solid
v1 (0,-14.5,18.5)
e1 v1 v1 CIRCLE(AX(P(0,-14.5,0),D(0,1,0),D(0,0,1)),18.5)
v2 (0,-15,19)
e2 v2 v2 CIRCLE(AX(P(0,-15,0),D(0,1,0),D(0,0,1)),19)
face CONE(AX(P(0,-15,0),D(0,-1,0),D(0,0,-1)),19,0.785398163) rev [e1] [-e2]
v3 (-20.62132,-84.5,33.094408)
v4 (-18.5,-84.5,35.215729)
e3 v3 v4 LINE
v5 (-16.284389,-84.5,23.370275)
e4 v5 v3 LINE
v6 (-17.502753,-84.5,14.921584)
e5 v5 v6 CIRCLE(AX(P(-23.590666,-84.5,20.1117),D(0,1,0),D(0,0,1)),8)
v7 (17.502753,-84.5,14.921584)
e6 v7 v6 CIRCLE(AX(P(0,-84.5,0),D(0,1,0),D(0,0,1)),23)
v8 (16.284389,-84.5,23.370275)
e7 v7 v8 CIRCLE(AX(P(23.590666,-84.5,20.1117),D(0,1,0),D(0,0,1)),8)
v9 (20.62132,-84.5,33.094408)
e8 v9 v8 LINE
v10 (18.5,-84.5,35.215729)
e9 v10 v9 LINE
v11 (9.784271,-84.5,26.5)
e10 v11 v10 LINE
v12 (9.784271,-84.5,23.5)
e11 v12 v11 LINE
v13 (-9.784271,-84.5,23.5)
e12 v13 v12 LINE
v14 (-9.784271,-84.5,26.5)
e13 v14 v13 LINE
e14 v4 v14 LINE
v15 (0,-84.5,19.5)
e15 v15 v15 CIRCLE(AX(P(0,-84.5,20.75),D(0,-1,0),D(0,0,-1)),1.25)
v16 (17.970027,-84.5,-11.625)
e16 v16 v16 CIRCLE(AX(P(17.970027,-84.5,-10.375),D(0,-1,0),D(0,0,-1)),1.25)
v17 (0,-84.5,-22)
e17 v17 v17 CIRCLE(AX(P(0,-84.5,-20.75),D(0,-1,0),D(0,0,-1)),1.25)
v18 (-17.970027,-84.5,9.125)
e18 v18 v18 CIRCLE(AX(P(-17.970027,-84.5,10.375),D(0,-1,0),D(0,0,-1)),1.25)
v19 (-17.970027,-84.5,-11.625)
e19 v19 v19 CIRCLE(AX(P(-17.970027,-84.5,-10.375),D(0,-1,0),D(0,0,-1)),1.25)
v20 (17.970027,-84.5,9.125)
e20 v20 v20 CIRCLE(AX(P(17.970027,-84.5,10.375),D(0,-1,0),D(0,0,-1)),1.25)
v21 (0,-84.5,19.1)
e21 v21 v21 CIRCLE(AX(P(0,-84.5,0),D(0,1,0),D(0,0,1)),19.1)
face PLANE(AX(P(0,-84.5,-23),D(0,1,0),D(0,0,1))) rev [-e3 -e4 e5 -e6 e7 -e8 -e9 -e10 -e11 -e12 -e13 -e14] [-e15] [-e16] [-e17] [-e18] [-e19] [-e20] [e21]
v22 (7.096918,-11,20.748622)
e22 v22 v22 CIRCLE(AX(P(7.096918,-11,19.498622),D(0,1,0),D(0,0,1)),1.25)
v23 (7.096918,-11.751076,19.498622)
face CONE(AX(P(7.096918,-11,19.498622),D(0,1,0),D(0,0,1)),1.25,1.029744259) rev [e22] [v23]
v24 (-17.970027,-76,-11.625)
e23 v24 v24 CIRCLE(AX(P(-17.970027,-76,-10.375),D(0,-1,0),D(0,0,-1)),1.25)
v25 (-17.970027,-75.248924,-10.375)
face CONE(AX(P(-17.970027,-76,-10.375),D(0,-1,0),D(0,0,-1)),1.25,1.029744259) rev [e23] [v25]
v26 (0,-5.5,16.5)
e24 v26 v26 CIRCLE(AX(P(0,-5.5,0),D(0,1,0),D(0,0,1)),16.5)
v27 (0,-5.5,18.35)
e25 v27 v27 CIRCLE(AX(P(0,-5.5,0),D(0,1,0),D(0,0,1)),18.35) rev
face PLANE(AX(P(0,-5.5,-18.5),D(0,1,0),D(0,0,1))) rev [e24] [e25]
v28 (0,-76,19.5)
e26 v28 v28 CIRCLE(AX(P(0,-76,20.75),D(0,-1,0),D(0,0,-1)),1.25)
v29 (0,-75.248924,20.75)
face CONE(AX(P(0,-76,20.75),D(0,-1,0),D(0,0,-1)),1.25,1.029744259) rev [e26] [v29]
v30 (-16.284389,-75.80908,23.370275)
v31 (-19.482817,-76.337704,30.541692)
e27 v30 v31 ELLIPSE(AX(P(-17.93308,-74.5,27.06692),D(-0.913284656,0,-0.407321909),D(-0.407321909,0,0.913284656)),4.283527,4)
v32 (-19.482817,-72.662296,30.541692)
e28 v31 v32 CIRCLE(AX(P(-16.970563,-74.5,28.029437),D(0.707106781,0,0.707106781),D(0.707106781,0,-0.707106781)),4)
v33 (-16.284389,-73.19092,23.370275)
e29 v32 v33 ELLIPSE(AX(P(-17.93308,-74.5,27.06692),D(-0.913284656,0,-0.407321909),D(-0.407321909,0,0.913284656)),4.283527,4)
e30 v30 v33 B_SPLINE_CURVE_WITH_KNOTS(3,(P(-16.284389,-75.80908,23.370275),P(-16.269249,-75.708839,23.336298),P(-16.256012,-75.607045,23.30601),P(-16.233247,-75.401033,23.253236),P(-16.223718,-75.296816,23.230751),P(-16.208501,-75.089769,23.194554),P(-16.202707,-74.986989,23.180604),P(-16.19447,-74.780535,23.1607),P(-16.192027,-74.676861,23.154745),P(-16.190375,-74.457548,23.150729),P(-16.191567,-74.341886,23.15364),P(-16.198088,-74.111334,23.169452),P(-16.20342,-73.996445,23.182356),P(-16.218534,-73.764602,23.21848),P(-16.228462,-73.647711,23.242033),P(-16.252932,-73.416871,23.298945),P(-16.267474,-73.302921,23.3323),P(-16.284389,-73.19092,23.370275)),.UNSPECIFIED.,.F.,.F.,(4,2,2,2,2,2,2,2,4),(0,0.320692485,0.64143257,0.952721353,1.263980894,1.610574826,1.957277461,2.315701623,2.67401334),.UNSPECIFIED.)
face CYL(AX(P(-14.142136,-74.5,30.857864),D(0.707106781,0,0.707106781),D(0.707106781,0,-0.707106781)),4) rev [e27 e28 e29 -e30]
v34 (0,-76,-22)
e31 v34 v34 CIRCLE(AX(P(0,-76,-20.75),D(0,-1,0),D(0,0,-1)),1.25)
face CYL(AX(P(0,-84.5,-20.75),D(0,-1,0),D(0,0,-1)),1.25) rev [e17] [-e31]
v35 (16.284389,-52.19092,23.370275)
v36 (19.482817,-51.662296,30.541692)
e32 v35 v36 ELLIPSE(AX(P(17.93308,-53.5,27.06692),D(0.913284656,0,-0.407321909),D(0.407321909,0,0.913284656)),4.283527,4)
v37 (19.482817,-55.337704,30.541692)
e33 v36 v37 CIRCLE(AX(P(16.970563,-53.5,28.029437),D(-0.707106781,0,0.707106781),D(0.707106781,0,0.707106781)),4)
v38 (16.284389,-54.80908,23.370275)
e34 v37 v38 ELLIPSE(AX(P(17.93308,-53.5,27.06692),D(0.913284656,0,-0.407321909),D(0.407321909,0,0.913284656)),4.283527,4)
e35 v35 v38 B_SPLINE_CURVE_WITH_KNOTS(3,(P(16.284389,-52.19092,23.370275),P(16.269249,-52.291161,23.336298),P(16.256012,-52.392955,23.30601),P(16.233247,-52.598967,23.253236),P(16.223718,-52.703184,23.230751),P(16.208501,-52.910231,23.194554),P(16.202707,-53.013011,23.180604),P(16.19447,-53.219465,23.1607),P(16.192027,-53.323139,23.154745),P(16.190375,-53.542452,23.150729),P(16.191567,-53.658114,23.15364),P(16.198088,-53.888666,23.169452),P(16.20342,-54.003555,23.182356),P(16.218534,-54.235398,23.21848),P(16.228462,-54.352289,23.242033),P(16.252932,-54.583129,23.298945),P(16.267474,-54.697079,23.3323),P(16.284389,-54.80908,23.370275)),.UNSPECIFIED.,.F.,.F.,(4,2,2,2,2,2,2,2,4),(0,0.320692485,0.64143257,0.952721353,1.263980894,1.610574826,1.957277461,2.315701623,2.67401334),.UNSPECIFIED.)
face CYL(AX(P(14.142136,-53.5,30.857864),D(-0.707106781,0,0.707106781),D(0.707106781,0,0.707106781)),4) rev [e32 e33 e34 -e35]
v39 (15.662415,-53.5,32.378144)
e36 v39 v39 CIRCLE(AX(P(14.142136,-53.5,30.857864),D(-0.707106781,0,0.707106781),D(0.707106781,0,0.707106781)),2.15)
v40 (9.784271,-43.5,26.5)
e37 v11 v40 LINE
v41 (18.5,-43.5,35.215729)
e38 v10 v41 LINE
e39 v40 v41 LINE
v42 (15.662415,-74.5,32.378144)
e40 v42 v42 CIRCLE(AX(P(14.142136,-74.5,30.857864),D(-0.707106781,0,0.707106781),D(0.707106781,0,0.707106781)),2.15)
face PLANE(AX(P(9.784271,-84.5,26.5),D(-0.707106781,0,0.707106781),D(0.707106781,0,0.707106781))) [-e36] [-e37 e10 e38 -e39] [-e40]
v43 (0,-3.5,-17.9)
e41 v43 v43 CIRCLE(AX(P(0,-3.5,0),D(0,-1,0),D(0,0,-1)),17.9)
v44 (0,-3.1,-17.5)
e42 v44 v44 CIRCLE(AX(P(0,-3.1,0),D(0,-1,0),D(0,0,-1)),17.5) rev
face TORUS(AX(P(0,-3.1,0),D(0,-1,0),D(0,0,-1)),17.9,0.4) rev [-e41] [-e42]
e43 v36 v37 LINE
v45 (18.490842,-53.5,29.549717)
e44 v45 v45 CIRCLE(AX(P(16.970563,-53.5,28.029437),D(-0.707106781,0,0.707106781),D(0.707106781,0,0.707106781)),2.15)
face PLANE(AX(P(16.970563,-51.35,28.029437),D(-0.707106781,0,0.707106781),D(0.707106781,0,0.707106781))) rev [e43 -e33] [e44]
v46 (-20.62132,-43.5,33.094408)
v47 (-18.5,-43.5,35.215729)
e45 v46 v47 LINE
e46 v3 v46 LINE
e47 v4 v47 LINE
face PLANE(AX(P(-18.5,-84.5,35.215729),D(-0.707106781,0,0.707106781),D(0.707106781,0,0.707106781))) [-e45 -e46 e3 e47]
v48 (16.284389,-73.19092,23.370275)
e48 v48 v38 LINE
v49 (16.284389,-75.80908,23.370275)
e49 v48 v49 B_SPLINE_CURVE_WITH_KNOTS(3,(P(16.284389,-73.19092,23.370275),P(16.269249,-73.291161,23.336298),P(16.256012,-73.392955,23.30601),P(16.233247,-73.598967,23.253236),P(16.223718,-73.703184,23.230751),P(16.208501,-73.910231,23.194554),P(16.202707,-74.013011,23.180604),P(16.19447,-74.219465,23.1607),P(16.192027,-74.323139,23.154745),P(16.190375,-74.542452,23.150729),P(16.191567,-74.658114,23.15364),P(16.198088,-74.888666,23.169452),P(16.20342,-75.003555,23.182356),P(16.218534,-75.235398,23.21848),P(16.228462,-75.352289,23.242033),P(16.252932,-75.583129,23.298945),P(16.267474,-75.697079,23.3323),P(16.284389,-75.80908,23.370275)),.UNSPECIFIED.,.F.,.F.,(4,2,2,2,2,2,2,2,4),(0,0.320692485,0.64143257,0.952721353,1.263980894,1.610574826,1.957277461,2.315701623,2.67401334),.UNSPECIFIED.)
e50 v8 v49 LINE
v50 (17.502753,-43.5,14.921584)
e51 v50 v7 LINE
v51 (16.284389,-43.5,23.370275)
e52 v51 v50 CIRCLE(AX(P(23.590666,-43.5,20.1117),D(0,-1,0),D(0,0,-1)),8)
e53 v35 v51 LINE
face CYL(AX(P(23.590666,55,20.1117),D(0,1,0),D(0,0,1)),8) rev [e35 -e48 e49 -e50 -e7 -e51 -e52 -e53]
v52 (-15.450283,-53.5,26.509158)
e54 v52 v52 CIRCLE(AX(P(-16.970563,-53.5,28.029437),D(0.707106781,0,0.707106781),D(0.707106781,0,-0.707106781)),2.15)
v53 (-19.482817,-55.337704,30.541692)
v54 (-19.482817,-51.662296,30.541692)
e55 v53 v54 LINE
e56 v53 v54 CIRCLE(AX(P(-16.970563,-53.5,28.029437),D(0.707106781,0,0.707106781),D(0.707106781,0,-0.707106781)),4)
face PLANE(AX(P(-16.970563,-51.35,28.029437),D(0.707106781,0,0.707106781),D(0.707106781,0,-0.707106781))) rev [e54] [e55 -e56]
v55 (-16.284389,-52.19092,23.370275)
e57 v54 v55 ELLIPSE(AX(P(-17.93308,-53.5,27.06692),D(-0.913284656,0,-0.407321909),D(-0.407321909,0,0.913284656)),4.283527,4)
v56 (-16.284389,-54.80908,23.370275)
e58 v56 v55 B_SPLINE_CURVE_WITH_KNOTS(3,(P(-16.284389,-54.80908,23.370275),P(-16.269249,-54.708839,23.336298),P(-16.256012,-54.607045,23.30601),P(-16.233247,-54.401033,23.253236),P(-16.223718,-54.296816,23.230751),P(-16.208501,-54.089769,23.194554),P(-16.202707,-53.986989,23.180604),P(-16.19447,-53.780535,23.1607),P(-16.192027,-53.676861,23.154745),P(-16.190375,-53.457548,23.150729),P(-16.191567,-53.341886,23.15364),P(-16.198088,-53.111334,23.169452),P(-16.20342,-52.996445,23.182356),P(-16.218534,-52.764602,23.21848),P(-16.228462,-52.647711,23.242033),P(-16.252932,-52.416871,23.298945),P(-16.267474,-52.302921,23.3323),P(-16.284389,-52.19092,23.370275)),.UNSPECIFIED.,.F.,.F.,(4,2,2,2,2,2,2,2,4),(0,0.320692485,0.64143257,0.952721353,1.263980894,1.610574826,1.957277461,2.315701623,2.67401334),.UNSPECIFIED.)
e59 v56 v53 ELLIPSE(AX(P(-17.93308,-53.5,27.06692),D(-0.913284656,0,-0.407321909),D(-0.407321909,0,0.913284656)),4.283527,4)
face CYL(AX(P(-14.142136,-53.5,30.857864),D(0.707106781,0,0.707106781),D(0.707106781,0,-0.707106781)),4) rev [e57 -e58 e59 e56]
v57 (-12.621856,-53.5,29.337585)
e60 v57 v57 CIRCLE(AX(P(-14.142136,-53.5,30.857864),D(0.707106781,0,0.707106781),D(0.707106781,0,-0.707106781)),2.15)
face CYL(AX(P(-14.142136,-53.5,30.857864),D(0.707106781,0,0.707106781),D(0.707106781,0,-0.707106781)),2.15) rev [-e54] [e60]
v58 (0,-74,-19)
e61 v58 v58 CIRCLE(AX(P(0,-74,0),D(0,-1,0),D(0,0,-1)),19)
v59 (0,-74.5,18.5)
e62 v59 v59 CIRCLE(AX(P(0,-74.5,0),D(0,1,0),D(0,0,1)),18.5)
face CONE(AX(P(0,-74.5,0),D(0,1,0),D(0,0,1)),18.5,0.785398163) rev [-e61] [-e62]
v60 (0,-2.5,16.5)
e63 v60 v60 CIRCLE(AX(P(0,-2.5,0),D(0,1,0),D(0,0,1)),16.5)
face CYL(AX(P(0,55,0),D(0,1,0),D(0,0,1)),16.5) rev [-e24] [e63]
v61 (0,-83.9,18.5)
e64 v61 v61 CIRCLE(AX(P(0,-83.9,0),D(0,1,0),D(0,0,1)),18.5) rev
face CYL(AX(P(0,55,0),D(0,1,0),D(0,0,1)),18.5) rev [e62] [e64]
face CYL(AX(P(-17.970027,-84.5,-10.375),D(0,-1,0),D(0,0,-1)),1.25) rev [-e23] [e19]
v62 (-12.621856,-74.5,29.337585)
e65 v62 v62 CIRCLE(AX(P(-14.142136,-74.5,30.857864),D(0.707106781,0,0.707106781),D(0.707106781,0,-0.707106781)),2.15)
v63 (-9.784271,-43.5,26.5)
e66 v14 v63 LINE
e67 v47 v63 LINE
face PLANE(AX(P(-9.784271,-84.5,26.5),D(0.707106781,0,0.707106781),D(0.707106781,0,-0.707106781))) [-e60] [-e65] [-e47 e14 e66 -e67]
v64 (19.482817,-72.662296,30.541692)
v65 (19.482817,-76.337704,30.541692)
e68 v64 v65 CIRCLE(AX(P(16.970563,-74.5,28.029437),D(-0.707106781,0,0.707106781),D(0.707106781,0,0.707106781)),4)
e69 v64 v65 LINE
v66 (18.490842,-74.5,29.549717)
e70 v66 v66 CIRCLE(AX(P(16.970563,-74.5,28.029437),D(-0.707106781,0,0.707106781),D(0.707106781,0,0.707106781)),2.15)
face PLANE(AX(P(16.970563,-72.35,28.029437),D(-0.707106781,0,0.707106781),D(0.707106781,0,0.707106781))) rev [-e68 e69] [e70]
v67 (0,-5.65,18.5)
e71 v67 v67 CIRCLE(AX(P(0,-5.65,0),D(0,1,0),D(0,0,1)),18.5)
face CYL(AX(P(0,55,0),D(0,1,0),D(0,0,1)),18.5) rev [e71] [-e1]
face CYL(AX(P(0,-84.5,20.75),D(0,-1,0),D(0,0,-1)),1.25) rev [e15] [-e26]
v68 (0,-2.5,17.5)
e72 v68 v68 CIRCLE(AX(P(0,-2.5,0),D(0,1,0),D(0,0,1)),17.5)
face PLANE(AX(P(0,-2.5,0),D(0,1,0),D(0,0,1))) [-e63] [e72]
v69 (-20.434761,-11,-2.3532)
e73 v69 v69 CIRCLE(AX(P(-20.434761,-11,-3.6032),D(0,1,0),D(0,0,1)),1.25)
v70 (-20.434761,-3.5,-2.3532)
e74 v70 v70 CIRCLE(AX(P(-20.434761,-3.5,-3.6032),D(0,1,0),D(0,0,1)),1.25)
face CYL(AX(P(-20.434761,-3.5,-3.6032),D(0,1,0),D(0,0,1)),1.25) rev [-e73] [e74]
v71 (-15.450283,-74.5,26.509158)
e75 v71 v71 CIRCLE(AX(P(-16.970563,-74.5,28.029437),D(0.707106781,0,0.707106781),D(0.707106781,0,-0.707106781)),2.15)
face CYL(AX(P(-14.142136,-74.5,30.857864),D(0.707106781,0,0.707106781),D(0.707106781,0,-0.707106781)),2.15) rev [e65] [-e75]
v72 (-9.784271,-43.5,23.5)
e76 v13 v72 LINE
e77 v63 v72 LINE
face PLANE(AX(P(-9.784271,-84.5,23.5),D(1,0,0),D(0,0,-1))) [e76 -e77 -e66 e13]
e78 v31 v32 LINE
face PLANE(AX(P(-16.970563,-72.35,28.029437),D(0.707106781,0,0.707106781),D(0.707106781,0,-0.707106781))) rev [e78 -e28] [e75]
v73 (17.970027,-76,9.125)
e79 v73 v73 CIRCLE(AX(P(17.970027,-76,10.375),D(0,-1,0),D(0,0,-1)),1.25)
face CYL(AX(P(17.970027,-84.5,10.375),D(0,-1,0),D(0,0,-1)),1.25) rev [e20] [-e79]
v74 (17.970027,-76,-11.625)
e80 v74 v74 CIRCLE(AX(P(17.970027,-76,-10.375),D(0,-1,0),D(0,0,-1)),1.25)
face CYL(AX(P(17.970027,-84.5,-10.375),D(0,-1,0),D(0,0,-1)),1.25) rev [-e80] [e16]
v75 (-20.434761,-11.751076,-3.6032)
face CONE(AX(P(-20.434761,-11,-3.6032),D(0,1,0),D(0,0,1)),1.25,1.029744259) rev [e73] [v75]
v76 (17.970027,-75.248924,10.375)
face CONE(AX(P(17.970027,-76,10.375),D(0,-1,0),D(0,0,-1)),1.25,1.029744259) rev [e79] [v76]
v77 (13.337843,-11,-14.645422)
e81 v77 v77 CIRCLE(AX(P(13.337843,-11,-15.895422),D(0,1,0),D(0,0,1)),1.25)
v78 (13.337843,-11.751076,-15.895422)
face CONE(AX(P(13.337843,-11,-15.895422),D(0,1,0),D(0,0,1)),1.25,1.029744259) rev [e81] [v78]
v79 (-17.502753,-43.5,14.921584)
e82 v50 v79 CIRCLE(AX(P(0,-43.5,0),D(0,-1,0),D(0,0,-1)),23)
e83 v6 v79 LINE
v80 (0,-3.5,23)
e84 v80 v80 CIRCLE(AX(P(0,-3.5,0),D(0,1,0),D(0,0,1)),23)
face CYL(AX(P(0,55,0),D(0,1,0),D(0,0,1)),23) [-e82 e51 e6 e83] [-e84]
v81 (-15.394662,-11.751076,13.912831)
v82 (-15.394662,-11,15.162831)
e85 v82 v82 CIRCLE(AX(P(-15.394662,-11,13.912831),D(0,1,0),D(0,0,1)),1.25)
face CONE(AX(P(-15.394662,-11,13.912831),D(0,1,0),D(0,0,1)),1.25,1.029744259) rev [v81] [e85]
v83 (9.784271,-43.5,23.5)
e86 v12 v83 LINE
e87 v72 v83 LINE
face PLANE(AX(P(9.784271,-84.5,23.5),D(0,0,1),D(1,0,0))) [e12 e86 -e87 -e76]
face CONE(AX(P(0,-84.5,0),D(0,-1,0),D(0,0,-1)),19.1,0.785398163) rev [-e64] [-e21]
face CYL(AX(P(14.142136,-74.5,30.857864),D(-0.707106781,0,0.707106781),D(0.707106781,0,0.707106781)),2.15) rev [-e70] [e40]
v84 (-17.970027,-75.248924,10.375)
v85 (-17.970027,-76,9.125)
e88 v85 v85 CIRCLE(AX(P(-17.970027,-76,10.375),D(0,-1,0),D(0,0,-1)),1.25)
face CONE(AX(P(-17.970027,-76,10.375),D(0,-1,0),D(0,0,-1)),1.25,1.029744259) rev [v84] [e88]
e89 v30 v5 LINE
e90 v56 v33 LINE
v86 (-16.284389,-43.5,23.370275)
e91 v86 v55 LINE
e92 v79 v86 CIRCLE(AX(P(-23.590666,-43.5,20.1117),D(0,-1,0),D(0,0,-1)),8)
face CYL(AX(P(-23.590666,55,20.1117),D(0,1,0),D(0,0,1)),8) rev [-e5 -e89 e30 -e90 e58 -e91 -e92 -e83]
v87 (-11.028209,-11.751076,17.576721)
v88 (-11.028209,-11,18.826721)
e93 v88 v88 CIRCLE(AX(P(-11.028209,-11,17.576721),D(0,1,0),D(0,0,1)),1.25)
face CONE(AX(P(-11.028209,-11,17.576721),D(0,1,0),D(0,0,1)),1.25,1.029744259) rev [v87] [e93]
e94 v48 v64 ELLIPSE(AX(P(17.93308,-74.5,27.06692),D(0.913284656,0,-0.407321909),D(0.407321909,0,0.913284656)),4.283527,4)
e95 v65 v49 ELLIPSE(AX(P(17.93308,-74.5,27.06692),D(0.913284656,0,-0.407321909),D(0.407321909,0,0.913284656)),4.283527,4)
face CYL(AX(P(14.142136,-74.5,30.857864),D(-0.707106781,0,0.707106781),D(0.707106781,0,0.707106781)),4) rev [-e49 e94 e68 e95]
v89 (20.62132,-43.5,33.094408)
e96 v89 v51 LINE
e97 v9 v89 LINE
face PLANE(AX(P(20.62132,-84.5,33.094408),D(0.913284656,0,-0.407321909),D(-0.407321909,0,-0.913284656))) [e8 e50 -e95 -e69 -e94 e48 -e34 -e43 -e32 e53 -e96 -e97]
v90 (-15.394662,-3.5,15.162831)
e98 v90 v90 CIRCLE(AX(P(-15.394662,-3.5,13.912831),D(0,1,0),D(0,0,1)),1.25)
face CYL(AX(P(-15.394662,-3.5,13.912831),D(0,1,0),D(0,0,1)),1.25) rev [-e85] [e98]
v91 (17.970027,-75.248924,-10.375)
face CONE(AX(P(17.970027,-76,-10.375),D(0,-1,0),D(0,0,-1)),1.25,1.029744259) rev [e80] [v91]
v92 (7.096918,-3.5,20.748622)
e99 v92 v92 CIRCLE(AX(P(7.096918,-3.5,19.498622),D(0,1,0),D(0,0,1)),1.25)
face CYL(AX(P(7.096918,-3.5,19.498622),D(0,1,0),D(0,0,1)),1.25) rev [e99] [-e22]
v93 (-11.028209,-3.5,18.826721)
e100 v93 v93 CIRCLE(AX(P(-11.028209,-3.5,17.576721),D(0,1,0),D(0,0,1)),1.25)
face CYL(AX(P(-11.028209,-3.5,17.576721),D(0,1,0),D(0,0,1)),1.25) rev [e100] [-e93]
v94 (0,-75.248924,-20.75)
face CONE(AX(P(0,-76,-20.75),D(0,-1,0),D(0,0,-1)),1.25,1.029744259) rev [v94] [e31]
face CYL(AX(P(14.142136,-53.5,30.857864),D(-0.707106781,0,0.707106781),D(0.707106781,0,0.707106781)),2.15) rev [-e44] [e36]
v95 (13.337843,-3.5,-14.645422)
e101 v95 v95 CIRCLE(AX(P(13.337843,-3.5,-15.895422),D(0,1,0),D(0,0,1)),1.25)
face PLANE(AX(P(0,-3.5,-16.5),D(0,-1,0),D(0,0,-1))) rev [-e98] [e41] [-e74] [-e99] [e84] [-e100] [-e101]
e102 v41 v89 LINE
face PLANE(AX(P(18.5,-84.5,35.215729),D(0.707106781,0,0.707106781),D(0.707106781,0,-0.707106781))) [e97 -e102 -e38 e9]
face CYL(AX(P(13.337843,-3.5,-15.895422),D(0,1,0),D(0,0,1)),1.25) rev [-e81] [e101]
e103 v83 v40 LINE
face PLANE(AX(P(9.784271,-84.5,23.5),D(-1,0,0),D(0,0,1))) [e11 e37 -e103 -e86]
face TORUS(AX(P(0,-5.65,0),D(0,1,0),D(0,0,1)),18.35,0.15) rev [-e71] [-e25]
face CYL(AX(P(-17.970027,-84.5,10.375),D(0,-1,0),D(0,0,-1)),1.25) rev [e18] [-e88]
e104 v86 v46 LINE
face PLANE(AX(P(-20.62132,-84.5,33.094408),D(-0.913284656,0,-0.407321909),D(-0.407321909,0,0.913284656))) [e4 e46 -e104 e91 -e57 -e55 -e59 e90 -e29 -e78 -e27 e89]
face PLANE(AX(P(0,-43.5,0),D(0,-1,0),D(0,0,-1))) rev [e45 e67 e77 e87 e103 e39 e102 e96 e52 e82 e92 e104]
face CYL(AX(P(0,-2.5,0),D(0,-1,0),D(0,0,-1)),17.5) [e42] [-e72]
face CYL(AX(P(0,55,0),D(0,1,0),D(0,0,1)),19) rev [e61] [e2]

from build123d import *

# Parameters (mm, degrees)
BOSS_EXTRUDE1_START           = -40
BOSS_EXTRUDE1_DEPTH           = 41
SKETCH7_W                     = 1.6
SKETCH7_H                     = 83.5
M3_CLEARANCE_HOLE1_AT_2_COUNT = 2
M3_CLEARANCE_HOLE1_AT_2_PITCH = 20.75
M3_CLEARANCE_HOLE1_AT_3_COUNT = 2
M3_CLEARANCE_HOLE1_AT_3_PITCH = 35.940054257
M3_CLEARANCE_HOLE1_AT_4_COUNT = 2
M3_CLEARANCE_HOLE1_AT_4_PITCH = 41.5
M3_CLEARANCE_HOLE1_AT_5_COUNT = 2
M3_CLEARANCE_HOLE1_AT_5_PITCH = 35.940054257
M3_CLEARANCE_HOLE1_AT_6_COUNT = 2
M3_CLEARANCE_HOLE1_AT_6_PITCH = 20.75
M3_TAPPED_HOLE2_AT_2_COUNT    = 2
M3_TAPPED_HOLE2_AT_2_PITCH    = 20.75
M3_TAPPED_HOLE2_AT_3_COUNT    = 2
M3_TAPPED_HOLE2_AT_3_PITCH    = 35.940054257
M3_TAPPED_HOLE2_AT_4_COUNT    = 2
M3_TAPPED_HOLE2_AT_4_PITCH    = 41.5
M3_TAPPED_HOLE2_AT_5_COUNT    = 2
M3_TAPPED_HOLE2_AT_5_PITCH    = 35.940054257
M3_TAPPED_HOLE2_AT_6_COUNT    = 2
M3_TAPPED_HOLE2_AT_6_PITCH    = 20.75
M3_TAPPED_HOLE1_AT_2_COUNT    = 2
M3_TAPPED_HOLE1_AT_2_PITCH    = 35.940054257
M3_TAPPED_HOLE1_AT_3_COUNT    = 2
M3_TAPPED_HOLE1_AT_3_PITCH    = 35.940054257
M3_TAPPED_HOLE1_AT_4_COUNT    = 2
M3_TAPPED_HOLE1_AT_4_PITCH    = 41.401555851
M3_TAPPED_HOLE1_AT_5_COUNT    = 2
M3_TAPPED_HOLE1_AT_5_PITCH    = 41.401555851
FILLET1_R                     = 8
BOSS_EXTRUDE2_START           = 1
SKETCH18_R                    = 17.5
SKETCH18_R_2                  = 16.5
BOSS_EXTRUDE2_DEPTH           = 1
ADVANCEDHOLE1_START           = -7.819805153
ADVANCEDHOLE1_DEPTH           = 2.897488682
ADVANCEDHOLE1_START_2         = -11.819805153
ADVANCEDHOLE1_2_OUTLINE_R     = 2.15
ADVANCEDHOLE1_2_DEPTH         = 4
ADVANCEDHOLE2_START           = 4.922316471
ADVANCEDHOLE2_DEPTH           = 2.897488682
ADVANCEDHOLE2_START_2         = 7.819805153
ADVANCEDHOLE2_2_OUTLINE_R     = 2.15
ADVANCEDHOLE2_2_DEPTH         = 4
FILLET2_R                     = 0.4
FILLET4_R                     = 0.15
CHAMFER1_SIZE                 = 0.5
CHAMFER2_SIZE                 = 0.6
FILLET5_R                     = 0.4


with BuildPart() as part:
    # Sketch2 → Revolve1 (revolve)
    with BuildSketch(Plane(origin=(0, 0, 0), x_dir=(0, 0, -1), z_dir=(1, 0, 0)), mode=Mode.PRIVATE) as revolve1_sk:
        Polygon((18.5, -83.5), (18.5, -74.5), (19, -74.5), (19, -14.5), (18.5, -14.5), (18.5, -5.5), (16.5, -5.5), (16.5, -3.5), (23, -3.5), (23, -84.5), (18.5, -84.5), align=None)
    revolve(revolve1_sk.sketch.rotate(Axis((0, 55, 0), (0, -1, 0)), 180), axis=Axis((0, 55, 0), (0, -1, 0)))

    # Sketch3 → Boss-Extrude1 (add, through all)
    with BuildSketch(Plane(origin=(0, -3.5, 0), x_dir=(1, 0, 0), z_dir=(0, 1, 0)).offset(BOSS_EXTRUDE1_START)):
        with BuildLine():
            Line((-18.5, -35.215728753), (-20.621320344, -33.094408409))
            Line((-20.621320344, -33.094408409), (-14, -18.248287591))
            ThreePointArc((-14, -18.248287591), (0, -23), (14, -18.248287591))
            Line((14, -18.248287591), (20.621320344, -33.094408409))
            Line((20.621320344, -33.094408409), (18.5, -35.215728753))
            Line((18.5, -35.215728753), (9.784271247, -26.5))
            Line((9.784271247, -26.5), (9.784271247, -23.5))
            Line((9.784271247, -23.5), (-9.784271247, -23.5))
            Line((-9.784271247, -23.5), (-9.784271247, -26.5))
            Line((-9.784271247, -26.5), (-18.5, -35.215728753))
        make_face()
    extrude(amount=-BOSS_EXTRUDE1_DEPTH)

    # Sketch10 → M3 Tapped Hole2 (revolve, cut)
    with BuildSketch(Plane(origin=(0, -84.5, -20.75), x_dir=(0, 0, -1), z_dir=(1, 0, 0))):
        Polygon((0, 0), (0, 9.251075774), (1.25, 8.5), (1.25, 0), align=None)
    m3_tapped_hole2 = revolve(axis=Axis((0, -90.85, -20.75), (0, 1, 0)), mode=Mode.SUBTRACT)

    # M3 Tapped Hole2 at 2: M3 Tapped Hole2 ×2
    with Locations(*[Vector(-0.8660254037844387, 0, 0.4999999999999999) * (i * M3_TAPPED_HOLE2_AT_2_PITCH) for i in range(1, M3_TAPPED_HOLE2_AT_2_COUNT)]):
        add(m3_tapped_hole2, mode=Mode.SUBTRACT)

    # M3 Tapped Hole2 at 3: M3 Tapped Hole2 ×2
    with Locations(*[Vector(-0.5000000000000002, 0, 0.8660254037844386) * (i * M3_TAPPED_HOLE2_AT_3_PITCH) for i in range(1, M3_TAPPED_HOLE2_AT_3_COUNT)]):
        add(m3_tapped_hole2, mode=Mode.SUBTRACT)

    # M3 Tapped Hole2 at 4: M3 Tapped Hole2 ×2
    with Locations(*[(0, 0, i * M3_TAPPED_HOLE2_AT_4_PITCH) for i in range(1, M3_TAPPED_HOLE2_AT_4_COUNT)]):
        add(m3_tapped_hole2, mode=Mode.SUBTRACT)

    # M3 Tapped Hole2 at 5: M3 Tapped Hole2 ×2
    with Locations(*[Vector(0.49999999999999983, 0, 0.8660254037844388) * (i * M3_TAPPED_HOLE2_AT_5_PITCH) for i in range(1, M3_TAPPED_HOLE2_AT_5_COUNT)]):
        add(m3_tapped_hole2, mode=Mode.SUBTRACT)

    # M3 Tapped Hole2 at 6: M3 Tapped Hole2 ×2
    with Locations(*[Vector(0.8660254037844387, 0, 0.49999999999999983) * (i * M3_TAPPED_HOLE2_AT_6_PITCH) for i in range(1, M3_TAPPED_HOLE2_AT_6_COUNT)]):
        add(m3_tapped_hole2, mode=Mode.SUBTRACT)

    # Sketch15 → M3 Tapped Hole1 (revolve, cut)
    with BuildSketch(Plane(origin=(13.337842901, -3.5, -15.895422195), x_dir=(0, 0, 1), z_dir=(1, 0, 0))):
        Polygon((0, 0), (0, 8.251075774), (1.25, 7.5), (1.25, 0), align=None)
    m3_tapped_hole1 = revolve(axis=Axis((13.337842901, 2.85, -15.895422195), (0, -1, 0)), mode=Mode.SUBTRACT)

    # M3 Tapped Hole1 at 2: M3 Tapped Hole1 ×2
    with Locations(*[Vector(-0.1736481776669317, 0, 0.9848077530122079) * (i * M3_TAPPED_HOLE1_AT_2_PITCH) for i in range(1, M3_TAPPED_HOLE1_AT_2_COUNT)]):
        add(m3_tapped_hole1, mode=Mode.SUBTRACT)

    # M3 Tapped Hole1 at 3: M3 Tapped Hole1 ×2
    with Locations(*[Vector(-0.9396926207859091, 0, 0.34202014332566705) * (i * M3_TAPPED_HOLE1_AT_3_PITCH) for i in range(1, M3_TAPPED_HOLE1_AT_3_COUNT)]):
        add(m3_tapped_hole1, mode=Mode.SUBTRACT)

    # M3 Tapped Hole1 at 4: M3 Tapped Hole1 ×2
    with Locations(*[Vector(-0.6939957840318893, 0, 0.7199790634080712) * (i * M3_TAPPED_HOLE1_AT_4_PITCH) for i in range(1, M3_TAPPED_HOLE1_AT_4_COUNT)]):
        add(m3_tapped_hole1, mode=Mode.SUBTRACT)

    # M3 Tapped Hole1 at 5: M3 Tapped Hole1 ×2
    with Locations(*[Vector(-0.5885298604450689, 0, 0.8084754809915435) * (i * M3_TAPPED_HOLE1_AT_5_PITCH) for i in range(1, M3_TAPPED_HOLE1_AT_5_COUNT)]):
        add(m3_tapped_hole1, mode=Mode.SUBTRACT)

    # Fillet1
    fillet1_edges = [part.edges().sort_by_distance(p)[0] for p in [
        (-14, -64, 18.248287591),
        (14, -64, 18.248287591),
    ]]
    fillet(fillet1_edges, radius=FILLET1_R)

    # Sketch18 → Boss-Extrude2 (add)
    with BuildSketch(Plane(origin=(0, -3.5, 0), x_dir=(1, 0, 0), z_dir=(0, 1, 0)).offset(BOSS_EXTRUDE2_START)):
        with Locations(Location((0, 0, 0), (0, 0, 90))):
            Circle(SKETCH18_R)
        with Locations(Location((0, 0, 0), (0, 0, 270))):
            Circle(SKETCH18_R_2, mode=Mode.SUBTRACT)
    extrude(amount=-BOSS_EXTRUDE2_DEPTH)

    # AdvancedHole1: read off the stored shape, not the designer's step
    # AdvancedHole1 outline → AdvancedHole1 (cut)
    with BuildSketch(Plane(origin=(0, 0, 0), x_dir=(0.707106781186546, 0, 0.707106781186549), z_dir=(0.707106781186549, 0, -0.707106781186546)).offset(ADVANCEDHOLE1_START)):
        with BuildLine():
            ThreePointArc((35.372669499, 76.337703714), (27.819805153, 74.5), (35.372669499, 72.662296286))
            Line((35.372669499, 72.662296286), (36.323213796, 74.5))
            Line((36.323213796, 74.5), (35.372669499, 76.337703714))
        make_face()
        with BuildLine():
            Line((35.372669499, 51.662296286), (36.323213796, 53.5))
            Line((36.323213796, 53.5), (35.372669499, 55.337703714))
            ThreePointArc((35.372669499, 55.337703714), (27.819805153, 53.5), (35.372669499, 51.662296286))
        make_face()
    extrude(amount=ADVANCEDHOLE1_DEPTH, mode=Mode.SUBTRACT)

    # AdvancedHole1 2 outline → AdvancedHole1 2 (cut)
    with BuildSketch(Plane(origin=(0, 0, 0), x_dir=(0.707106781186546, 0, 0.707106781186549), z_dir=(0.707106781186549, 0, -0.707106781186546)).offset(ADVANCEDHOLE1_START_2)):
        with Locations((31.819805153, 74.5)):
            Circle(ADVANCEDHOLE1_2_OUTLINE_R)
        with Locations((31.819805153, 53.5)):
            Circle(ADVANCEDHOLE1_2_OUTLINE_R)
    extrude(amount=ADVANCEDHOLE1_2_DEPTH, mode=Mode.SUBTRACT)

    # AdvancedHole2: read off the stored shape, not the designer's step
    # AdvancedHole2 outline → AdvancedHole2 (cut)
    with BuildSketch(Plane(origin=(0, 0, 0), x_dir=(0.707106781186546, 0, -0.707106781186549), z_dir=(0.707106781186549, 0, 0.707106781186546)).offset(ADVANCEDHOLE2_START)):
        with BuildLine():
            Line((-36.323213796, -74.5), (-35.372669499, -76.337703714))
            ThreePointArc((-35.372669499, -76.337703714), (-27.819805153, -74.5), (-35.372669499, -72.662296286))
            Line((-35.372669499, -72.662296286), (-36.323213796, -74.5))
        make_face()
        with BuildLine():
            Line((-35.372669499, -51.662296286), (-36.323213796, -53.5))
            Line((-36.323213796, -53.5), (-35.372669499, -55.337703714))
            ThreePointArc((-35.372669499, -55.337703714), (-27.819805153, -53.5), (-35.372669499, -51.662296286))
        make_face()
    extrude(amount=ADVANCEDHOLE2_DEPTH, mode=Mode.SUBTRACT)

    # AdvancedHole2 2 outline → AdvancedHole2 2 (cut)
    with BuildSketch(Plane(origin=(0, 0, 0), x_dir=(0.707106781186546, 0, -0.707106781186549), z_dir=(0.707106781186549, 0, 0.707106781186546)).offset(ADVANCEDHOLE2_START_2)):
        with Locations((-31.819805153, -74.5)):
            Circle(ADVANCEDHOLE2_2_OUTLINE_R)
        with Locations((-31.819805153, -53.5)):
            Circle(ADVANCEDHOLE2_2_OUTLINE_R)
    extrude(amount=ADVANCEDHOLE2_2_DEPTH, mode=Mode.SUBTRACT)

    # Fillet2
    fillet2_edges = [part.edges().sort_by_distance(p)[0] for p in [
        (0, -3.5, 17.5),
    ]]
    fillet(fillet2_edges, radius=FILLET2_R)

    # Fillet4
    fillet4_edges = [part.edges().sort_by_distance(p)[0] for p in [
        (0, -5.5, -18.5),
    ]]
    fillet(fillet4_edges, radius=FILLET4_R)

    # Chamfer1
    chamfer1_edges = [part.edges().sort_by_distance(p)[0] for p in [
        (0, -14.5, -19),
        (0, -74.5, -19),
    ]]
    chamfer(chamfer1_edges, length=CHAMFER1_SIZE - 0.0001)  # a hair under: the kernel refuses the full size

    # Chamfer2
    chamfer2_edges = [part.edges().sort_by_distance(p)[0] for p in [
        (0, -84.5, -18.5),
    ]]
    chamfer(chamfer2_edges, length=CHAMFER2_SIZE)


with BuildPart() as body_2:
    # Sketch5 → Revolve2 (revolve)
    with BuildSketch(Plane(origin=(0, 0, 0), x_dir=(0, 0, -1), z_dir=(1, 0, 0)), mode=Mode.PRIVATE) as revolve2_sk:
        Polygon((18.5, -83.5), (16.5, -83.5), (16.5, -87), (23, -87), (23, -85), (18.5, -85), align=None)
    revolve(revolve2_sk.sketch.rotate(Axis((0, 55, 0), (0, -1, 0)), 180), axis=Axis((0, 55, 0), (0, -1, 0)))

    # Sketch7 → M3 Clearance Hole1 (revolve, cut)
    with BuildSketch(Plane(origin=(17.970027129, -87, -10.375), x_dir=(0, 0, -1), z_dir=(1, 0, 0))):
        with Locations((0.8, 41.75)):
            Rectangle(SKETCH7_W, SKETCH7_H)
    m3_clearance_hole1 = revolve(axis=Axis((17.970027129, -93.35, -10.375), (0, 1, 0)), mode=Mode.SUBTRACT)

    # M3 Clearance Hole1 at 2: M3 Clearance Hole1 ×2
    with Locations(*[Vector(-0.8660254037844387, 0, -0.49999999999999983) * (i * M3_CLEARANCE_HOLE1_AT_2_PITCH) for i in range(1, M3_CLEARANCE_HOLE1_AT_2_COUNT)]):
        add(m3_clearance_hole1, mode=Mode.SUBTRACT)

    # M3 Clearance Hole1 at 3: M3 Clearance Hole1 ×2
    with Locations(*[(-i * M3_CLEARANCE_HOLE1_AT_3_PITCH, 0, 0) for i in range(1, M3_CLEARANCE_HOLE1_AT_3_COUNT)]):
        add(m3_clearance_hole1, mode=Mode.SUBTRACT)

    # M3 Clearance Hole1 at 4: M3 Clearance Hole1 ×2
    with Locations(*[Vector(-0.8660254037844387, 0, 0.5) * (i * M3_CLEARANCE_HOLE1_AT_4_PITCH) for i in range(1, M3_CLEARANCE_HOLE1_AT_4_COUNT)]):
        add(m3_clearance_hole1, mode=Mode.SUBTRACT)

    # M3 Clearance Hole1 at 5: M3 Clearance Hole1 ×2
    with Locations(*[Vector(-0.5000000000000001, 0, 0.8660254037844387) * (i * M3_CLEARANCE_HOLE1_AT_5_PITCH) for i in range(1, M3_CLEARANCE_HOLE1_AT_5_COUNT)]):
        add(m3_clearance_hole1, mode=Mode.SUBTRACT)

    # M3 Clearance Hole1 at 6: M3 Clearance Hole1 ×2
    with Locations(*[(0, 0, i * M3_CLEARANCE_HOLE1_AT_6_PITCH) for i in range(1, M3_CLEARANCE_HOLE1_AT_6_COUNT)]):
        add(m3_clearance_hole1, mode=Mode.SUBTRACT)

    # Fillet5
    fillet5_edges = [body_2.edges().sort_by_distance(p)[0] for p in [
        (0, -85, -18.5),
    ]]
    fillet(fillet5_edges, radius=FILLET5_R)


solid = part.part
